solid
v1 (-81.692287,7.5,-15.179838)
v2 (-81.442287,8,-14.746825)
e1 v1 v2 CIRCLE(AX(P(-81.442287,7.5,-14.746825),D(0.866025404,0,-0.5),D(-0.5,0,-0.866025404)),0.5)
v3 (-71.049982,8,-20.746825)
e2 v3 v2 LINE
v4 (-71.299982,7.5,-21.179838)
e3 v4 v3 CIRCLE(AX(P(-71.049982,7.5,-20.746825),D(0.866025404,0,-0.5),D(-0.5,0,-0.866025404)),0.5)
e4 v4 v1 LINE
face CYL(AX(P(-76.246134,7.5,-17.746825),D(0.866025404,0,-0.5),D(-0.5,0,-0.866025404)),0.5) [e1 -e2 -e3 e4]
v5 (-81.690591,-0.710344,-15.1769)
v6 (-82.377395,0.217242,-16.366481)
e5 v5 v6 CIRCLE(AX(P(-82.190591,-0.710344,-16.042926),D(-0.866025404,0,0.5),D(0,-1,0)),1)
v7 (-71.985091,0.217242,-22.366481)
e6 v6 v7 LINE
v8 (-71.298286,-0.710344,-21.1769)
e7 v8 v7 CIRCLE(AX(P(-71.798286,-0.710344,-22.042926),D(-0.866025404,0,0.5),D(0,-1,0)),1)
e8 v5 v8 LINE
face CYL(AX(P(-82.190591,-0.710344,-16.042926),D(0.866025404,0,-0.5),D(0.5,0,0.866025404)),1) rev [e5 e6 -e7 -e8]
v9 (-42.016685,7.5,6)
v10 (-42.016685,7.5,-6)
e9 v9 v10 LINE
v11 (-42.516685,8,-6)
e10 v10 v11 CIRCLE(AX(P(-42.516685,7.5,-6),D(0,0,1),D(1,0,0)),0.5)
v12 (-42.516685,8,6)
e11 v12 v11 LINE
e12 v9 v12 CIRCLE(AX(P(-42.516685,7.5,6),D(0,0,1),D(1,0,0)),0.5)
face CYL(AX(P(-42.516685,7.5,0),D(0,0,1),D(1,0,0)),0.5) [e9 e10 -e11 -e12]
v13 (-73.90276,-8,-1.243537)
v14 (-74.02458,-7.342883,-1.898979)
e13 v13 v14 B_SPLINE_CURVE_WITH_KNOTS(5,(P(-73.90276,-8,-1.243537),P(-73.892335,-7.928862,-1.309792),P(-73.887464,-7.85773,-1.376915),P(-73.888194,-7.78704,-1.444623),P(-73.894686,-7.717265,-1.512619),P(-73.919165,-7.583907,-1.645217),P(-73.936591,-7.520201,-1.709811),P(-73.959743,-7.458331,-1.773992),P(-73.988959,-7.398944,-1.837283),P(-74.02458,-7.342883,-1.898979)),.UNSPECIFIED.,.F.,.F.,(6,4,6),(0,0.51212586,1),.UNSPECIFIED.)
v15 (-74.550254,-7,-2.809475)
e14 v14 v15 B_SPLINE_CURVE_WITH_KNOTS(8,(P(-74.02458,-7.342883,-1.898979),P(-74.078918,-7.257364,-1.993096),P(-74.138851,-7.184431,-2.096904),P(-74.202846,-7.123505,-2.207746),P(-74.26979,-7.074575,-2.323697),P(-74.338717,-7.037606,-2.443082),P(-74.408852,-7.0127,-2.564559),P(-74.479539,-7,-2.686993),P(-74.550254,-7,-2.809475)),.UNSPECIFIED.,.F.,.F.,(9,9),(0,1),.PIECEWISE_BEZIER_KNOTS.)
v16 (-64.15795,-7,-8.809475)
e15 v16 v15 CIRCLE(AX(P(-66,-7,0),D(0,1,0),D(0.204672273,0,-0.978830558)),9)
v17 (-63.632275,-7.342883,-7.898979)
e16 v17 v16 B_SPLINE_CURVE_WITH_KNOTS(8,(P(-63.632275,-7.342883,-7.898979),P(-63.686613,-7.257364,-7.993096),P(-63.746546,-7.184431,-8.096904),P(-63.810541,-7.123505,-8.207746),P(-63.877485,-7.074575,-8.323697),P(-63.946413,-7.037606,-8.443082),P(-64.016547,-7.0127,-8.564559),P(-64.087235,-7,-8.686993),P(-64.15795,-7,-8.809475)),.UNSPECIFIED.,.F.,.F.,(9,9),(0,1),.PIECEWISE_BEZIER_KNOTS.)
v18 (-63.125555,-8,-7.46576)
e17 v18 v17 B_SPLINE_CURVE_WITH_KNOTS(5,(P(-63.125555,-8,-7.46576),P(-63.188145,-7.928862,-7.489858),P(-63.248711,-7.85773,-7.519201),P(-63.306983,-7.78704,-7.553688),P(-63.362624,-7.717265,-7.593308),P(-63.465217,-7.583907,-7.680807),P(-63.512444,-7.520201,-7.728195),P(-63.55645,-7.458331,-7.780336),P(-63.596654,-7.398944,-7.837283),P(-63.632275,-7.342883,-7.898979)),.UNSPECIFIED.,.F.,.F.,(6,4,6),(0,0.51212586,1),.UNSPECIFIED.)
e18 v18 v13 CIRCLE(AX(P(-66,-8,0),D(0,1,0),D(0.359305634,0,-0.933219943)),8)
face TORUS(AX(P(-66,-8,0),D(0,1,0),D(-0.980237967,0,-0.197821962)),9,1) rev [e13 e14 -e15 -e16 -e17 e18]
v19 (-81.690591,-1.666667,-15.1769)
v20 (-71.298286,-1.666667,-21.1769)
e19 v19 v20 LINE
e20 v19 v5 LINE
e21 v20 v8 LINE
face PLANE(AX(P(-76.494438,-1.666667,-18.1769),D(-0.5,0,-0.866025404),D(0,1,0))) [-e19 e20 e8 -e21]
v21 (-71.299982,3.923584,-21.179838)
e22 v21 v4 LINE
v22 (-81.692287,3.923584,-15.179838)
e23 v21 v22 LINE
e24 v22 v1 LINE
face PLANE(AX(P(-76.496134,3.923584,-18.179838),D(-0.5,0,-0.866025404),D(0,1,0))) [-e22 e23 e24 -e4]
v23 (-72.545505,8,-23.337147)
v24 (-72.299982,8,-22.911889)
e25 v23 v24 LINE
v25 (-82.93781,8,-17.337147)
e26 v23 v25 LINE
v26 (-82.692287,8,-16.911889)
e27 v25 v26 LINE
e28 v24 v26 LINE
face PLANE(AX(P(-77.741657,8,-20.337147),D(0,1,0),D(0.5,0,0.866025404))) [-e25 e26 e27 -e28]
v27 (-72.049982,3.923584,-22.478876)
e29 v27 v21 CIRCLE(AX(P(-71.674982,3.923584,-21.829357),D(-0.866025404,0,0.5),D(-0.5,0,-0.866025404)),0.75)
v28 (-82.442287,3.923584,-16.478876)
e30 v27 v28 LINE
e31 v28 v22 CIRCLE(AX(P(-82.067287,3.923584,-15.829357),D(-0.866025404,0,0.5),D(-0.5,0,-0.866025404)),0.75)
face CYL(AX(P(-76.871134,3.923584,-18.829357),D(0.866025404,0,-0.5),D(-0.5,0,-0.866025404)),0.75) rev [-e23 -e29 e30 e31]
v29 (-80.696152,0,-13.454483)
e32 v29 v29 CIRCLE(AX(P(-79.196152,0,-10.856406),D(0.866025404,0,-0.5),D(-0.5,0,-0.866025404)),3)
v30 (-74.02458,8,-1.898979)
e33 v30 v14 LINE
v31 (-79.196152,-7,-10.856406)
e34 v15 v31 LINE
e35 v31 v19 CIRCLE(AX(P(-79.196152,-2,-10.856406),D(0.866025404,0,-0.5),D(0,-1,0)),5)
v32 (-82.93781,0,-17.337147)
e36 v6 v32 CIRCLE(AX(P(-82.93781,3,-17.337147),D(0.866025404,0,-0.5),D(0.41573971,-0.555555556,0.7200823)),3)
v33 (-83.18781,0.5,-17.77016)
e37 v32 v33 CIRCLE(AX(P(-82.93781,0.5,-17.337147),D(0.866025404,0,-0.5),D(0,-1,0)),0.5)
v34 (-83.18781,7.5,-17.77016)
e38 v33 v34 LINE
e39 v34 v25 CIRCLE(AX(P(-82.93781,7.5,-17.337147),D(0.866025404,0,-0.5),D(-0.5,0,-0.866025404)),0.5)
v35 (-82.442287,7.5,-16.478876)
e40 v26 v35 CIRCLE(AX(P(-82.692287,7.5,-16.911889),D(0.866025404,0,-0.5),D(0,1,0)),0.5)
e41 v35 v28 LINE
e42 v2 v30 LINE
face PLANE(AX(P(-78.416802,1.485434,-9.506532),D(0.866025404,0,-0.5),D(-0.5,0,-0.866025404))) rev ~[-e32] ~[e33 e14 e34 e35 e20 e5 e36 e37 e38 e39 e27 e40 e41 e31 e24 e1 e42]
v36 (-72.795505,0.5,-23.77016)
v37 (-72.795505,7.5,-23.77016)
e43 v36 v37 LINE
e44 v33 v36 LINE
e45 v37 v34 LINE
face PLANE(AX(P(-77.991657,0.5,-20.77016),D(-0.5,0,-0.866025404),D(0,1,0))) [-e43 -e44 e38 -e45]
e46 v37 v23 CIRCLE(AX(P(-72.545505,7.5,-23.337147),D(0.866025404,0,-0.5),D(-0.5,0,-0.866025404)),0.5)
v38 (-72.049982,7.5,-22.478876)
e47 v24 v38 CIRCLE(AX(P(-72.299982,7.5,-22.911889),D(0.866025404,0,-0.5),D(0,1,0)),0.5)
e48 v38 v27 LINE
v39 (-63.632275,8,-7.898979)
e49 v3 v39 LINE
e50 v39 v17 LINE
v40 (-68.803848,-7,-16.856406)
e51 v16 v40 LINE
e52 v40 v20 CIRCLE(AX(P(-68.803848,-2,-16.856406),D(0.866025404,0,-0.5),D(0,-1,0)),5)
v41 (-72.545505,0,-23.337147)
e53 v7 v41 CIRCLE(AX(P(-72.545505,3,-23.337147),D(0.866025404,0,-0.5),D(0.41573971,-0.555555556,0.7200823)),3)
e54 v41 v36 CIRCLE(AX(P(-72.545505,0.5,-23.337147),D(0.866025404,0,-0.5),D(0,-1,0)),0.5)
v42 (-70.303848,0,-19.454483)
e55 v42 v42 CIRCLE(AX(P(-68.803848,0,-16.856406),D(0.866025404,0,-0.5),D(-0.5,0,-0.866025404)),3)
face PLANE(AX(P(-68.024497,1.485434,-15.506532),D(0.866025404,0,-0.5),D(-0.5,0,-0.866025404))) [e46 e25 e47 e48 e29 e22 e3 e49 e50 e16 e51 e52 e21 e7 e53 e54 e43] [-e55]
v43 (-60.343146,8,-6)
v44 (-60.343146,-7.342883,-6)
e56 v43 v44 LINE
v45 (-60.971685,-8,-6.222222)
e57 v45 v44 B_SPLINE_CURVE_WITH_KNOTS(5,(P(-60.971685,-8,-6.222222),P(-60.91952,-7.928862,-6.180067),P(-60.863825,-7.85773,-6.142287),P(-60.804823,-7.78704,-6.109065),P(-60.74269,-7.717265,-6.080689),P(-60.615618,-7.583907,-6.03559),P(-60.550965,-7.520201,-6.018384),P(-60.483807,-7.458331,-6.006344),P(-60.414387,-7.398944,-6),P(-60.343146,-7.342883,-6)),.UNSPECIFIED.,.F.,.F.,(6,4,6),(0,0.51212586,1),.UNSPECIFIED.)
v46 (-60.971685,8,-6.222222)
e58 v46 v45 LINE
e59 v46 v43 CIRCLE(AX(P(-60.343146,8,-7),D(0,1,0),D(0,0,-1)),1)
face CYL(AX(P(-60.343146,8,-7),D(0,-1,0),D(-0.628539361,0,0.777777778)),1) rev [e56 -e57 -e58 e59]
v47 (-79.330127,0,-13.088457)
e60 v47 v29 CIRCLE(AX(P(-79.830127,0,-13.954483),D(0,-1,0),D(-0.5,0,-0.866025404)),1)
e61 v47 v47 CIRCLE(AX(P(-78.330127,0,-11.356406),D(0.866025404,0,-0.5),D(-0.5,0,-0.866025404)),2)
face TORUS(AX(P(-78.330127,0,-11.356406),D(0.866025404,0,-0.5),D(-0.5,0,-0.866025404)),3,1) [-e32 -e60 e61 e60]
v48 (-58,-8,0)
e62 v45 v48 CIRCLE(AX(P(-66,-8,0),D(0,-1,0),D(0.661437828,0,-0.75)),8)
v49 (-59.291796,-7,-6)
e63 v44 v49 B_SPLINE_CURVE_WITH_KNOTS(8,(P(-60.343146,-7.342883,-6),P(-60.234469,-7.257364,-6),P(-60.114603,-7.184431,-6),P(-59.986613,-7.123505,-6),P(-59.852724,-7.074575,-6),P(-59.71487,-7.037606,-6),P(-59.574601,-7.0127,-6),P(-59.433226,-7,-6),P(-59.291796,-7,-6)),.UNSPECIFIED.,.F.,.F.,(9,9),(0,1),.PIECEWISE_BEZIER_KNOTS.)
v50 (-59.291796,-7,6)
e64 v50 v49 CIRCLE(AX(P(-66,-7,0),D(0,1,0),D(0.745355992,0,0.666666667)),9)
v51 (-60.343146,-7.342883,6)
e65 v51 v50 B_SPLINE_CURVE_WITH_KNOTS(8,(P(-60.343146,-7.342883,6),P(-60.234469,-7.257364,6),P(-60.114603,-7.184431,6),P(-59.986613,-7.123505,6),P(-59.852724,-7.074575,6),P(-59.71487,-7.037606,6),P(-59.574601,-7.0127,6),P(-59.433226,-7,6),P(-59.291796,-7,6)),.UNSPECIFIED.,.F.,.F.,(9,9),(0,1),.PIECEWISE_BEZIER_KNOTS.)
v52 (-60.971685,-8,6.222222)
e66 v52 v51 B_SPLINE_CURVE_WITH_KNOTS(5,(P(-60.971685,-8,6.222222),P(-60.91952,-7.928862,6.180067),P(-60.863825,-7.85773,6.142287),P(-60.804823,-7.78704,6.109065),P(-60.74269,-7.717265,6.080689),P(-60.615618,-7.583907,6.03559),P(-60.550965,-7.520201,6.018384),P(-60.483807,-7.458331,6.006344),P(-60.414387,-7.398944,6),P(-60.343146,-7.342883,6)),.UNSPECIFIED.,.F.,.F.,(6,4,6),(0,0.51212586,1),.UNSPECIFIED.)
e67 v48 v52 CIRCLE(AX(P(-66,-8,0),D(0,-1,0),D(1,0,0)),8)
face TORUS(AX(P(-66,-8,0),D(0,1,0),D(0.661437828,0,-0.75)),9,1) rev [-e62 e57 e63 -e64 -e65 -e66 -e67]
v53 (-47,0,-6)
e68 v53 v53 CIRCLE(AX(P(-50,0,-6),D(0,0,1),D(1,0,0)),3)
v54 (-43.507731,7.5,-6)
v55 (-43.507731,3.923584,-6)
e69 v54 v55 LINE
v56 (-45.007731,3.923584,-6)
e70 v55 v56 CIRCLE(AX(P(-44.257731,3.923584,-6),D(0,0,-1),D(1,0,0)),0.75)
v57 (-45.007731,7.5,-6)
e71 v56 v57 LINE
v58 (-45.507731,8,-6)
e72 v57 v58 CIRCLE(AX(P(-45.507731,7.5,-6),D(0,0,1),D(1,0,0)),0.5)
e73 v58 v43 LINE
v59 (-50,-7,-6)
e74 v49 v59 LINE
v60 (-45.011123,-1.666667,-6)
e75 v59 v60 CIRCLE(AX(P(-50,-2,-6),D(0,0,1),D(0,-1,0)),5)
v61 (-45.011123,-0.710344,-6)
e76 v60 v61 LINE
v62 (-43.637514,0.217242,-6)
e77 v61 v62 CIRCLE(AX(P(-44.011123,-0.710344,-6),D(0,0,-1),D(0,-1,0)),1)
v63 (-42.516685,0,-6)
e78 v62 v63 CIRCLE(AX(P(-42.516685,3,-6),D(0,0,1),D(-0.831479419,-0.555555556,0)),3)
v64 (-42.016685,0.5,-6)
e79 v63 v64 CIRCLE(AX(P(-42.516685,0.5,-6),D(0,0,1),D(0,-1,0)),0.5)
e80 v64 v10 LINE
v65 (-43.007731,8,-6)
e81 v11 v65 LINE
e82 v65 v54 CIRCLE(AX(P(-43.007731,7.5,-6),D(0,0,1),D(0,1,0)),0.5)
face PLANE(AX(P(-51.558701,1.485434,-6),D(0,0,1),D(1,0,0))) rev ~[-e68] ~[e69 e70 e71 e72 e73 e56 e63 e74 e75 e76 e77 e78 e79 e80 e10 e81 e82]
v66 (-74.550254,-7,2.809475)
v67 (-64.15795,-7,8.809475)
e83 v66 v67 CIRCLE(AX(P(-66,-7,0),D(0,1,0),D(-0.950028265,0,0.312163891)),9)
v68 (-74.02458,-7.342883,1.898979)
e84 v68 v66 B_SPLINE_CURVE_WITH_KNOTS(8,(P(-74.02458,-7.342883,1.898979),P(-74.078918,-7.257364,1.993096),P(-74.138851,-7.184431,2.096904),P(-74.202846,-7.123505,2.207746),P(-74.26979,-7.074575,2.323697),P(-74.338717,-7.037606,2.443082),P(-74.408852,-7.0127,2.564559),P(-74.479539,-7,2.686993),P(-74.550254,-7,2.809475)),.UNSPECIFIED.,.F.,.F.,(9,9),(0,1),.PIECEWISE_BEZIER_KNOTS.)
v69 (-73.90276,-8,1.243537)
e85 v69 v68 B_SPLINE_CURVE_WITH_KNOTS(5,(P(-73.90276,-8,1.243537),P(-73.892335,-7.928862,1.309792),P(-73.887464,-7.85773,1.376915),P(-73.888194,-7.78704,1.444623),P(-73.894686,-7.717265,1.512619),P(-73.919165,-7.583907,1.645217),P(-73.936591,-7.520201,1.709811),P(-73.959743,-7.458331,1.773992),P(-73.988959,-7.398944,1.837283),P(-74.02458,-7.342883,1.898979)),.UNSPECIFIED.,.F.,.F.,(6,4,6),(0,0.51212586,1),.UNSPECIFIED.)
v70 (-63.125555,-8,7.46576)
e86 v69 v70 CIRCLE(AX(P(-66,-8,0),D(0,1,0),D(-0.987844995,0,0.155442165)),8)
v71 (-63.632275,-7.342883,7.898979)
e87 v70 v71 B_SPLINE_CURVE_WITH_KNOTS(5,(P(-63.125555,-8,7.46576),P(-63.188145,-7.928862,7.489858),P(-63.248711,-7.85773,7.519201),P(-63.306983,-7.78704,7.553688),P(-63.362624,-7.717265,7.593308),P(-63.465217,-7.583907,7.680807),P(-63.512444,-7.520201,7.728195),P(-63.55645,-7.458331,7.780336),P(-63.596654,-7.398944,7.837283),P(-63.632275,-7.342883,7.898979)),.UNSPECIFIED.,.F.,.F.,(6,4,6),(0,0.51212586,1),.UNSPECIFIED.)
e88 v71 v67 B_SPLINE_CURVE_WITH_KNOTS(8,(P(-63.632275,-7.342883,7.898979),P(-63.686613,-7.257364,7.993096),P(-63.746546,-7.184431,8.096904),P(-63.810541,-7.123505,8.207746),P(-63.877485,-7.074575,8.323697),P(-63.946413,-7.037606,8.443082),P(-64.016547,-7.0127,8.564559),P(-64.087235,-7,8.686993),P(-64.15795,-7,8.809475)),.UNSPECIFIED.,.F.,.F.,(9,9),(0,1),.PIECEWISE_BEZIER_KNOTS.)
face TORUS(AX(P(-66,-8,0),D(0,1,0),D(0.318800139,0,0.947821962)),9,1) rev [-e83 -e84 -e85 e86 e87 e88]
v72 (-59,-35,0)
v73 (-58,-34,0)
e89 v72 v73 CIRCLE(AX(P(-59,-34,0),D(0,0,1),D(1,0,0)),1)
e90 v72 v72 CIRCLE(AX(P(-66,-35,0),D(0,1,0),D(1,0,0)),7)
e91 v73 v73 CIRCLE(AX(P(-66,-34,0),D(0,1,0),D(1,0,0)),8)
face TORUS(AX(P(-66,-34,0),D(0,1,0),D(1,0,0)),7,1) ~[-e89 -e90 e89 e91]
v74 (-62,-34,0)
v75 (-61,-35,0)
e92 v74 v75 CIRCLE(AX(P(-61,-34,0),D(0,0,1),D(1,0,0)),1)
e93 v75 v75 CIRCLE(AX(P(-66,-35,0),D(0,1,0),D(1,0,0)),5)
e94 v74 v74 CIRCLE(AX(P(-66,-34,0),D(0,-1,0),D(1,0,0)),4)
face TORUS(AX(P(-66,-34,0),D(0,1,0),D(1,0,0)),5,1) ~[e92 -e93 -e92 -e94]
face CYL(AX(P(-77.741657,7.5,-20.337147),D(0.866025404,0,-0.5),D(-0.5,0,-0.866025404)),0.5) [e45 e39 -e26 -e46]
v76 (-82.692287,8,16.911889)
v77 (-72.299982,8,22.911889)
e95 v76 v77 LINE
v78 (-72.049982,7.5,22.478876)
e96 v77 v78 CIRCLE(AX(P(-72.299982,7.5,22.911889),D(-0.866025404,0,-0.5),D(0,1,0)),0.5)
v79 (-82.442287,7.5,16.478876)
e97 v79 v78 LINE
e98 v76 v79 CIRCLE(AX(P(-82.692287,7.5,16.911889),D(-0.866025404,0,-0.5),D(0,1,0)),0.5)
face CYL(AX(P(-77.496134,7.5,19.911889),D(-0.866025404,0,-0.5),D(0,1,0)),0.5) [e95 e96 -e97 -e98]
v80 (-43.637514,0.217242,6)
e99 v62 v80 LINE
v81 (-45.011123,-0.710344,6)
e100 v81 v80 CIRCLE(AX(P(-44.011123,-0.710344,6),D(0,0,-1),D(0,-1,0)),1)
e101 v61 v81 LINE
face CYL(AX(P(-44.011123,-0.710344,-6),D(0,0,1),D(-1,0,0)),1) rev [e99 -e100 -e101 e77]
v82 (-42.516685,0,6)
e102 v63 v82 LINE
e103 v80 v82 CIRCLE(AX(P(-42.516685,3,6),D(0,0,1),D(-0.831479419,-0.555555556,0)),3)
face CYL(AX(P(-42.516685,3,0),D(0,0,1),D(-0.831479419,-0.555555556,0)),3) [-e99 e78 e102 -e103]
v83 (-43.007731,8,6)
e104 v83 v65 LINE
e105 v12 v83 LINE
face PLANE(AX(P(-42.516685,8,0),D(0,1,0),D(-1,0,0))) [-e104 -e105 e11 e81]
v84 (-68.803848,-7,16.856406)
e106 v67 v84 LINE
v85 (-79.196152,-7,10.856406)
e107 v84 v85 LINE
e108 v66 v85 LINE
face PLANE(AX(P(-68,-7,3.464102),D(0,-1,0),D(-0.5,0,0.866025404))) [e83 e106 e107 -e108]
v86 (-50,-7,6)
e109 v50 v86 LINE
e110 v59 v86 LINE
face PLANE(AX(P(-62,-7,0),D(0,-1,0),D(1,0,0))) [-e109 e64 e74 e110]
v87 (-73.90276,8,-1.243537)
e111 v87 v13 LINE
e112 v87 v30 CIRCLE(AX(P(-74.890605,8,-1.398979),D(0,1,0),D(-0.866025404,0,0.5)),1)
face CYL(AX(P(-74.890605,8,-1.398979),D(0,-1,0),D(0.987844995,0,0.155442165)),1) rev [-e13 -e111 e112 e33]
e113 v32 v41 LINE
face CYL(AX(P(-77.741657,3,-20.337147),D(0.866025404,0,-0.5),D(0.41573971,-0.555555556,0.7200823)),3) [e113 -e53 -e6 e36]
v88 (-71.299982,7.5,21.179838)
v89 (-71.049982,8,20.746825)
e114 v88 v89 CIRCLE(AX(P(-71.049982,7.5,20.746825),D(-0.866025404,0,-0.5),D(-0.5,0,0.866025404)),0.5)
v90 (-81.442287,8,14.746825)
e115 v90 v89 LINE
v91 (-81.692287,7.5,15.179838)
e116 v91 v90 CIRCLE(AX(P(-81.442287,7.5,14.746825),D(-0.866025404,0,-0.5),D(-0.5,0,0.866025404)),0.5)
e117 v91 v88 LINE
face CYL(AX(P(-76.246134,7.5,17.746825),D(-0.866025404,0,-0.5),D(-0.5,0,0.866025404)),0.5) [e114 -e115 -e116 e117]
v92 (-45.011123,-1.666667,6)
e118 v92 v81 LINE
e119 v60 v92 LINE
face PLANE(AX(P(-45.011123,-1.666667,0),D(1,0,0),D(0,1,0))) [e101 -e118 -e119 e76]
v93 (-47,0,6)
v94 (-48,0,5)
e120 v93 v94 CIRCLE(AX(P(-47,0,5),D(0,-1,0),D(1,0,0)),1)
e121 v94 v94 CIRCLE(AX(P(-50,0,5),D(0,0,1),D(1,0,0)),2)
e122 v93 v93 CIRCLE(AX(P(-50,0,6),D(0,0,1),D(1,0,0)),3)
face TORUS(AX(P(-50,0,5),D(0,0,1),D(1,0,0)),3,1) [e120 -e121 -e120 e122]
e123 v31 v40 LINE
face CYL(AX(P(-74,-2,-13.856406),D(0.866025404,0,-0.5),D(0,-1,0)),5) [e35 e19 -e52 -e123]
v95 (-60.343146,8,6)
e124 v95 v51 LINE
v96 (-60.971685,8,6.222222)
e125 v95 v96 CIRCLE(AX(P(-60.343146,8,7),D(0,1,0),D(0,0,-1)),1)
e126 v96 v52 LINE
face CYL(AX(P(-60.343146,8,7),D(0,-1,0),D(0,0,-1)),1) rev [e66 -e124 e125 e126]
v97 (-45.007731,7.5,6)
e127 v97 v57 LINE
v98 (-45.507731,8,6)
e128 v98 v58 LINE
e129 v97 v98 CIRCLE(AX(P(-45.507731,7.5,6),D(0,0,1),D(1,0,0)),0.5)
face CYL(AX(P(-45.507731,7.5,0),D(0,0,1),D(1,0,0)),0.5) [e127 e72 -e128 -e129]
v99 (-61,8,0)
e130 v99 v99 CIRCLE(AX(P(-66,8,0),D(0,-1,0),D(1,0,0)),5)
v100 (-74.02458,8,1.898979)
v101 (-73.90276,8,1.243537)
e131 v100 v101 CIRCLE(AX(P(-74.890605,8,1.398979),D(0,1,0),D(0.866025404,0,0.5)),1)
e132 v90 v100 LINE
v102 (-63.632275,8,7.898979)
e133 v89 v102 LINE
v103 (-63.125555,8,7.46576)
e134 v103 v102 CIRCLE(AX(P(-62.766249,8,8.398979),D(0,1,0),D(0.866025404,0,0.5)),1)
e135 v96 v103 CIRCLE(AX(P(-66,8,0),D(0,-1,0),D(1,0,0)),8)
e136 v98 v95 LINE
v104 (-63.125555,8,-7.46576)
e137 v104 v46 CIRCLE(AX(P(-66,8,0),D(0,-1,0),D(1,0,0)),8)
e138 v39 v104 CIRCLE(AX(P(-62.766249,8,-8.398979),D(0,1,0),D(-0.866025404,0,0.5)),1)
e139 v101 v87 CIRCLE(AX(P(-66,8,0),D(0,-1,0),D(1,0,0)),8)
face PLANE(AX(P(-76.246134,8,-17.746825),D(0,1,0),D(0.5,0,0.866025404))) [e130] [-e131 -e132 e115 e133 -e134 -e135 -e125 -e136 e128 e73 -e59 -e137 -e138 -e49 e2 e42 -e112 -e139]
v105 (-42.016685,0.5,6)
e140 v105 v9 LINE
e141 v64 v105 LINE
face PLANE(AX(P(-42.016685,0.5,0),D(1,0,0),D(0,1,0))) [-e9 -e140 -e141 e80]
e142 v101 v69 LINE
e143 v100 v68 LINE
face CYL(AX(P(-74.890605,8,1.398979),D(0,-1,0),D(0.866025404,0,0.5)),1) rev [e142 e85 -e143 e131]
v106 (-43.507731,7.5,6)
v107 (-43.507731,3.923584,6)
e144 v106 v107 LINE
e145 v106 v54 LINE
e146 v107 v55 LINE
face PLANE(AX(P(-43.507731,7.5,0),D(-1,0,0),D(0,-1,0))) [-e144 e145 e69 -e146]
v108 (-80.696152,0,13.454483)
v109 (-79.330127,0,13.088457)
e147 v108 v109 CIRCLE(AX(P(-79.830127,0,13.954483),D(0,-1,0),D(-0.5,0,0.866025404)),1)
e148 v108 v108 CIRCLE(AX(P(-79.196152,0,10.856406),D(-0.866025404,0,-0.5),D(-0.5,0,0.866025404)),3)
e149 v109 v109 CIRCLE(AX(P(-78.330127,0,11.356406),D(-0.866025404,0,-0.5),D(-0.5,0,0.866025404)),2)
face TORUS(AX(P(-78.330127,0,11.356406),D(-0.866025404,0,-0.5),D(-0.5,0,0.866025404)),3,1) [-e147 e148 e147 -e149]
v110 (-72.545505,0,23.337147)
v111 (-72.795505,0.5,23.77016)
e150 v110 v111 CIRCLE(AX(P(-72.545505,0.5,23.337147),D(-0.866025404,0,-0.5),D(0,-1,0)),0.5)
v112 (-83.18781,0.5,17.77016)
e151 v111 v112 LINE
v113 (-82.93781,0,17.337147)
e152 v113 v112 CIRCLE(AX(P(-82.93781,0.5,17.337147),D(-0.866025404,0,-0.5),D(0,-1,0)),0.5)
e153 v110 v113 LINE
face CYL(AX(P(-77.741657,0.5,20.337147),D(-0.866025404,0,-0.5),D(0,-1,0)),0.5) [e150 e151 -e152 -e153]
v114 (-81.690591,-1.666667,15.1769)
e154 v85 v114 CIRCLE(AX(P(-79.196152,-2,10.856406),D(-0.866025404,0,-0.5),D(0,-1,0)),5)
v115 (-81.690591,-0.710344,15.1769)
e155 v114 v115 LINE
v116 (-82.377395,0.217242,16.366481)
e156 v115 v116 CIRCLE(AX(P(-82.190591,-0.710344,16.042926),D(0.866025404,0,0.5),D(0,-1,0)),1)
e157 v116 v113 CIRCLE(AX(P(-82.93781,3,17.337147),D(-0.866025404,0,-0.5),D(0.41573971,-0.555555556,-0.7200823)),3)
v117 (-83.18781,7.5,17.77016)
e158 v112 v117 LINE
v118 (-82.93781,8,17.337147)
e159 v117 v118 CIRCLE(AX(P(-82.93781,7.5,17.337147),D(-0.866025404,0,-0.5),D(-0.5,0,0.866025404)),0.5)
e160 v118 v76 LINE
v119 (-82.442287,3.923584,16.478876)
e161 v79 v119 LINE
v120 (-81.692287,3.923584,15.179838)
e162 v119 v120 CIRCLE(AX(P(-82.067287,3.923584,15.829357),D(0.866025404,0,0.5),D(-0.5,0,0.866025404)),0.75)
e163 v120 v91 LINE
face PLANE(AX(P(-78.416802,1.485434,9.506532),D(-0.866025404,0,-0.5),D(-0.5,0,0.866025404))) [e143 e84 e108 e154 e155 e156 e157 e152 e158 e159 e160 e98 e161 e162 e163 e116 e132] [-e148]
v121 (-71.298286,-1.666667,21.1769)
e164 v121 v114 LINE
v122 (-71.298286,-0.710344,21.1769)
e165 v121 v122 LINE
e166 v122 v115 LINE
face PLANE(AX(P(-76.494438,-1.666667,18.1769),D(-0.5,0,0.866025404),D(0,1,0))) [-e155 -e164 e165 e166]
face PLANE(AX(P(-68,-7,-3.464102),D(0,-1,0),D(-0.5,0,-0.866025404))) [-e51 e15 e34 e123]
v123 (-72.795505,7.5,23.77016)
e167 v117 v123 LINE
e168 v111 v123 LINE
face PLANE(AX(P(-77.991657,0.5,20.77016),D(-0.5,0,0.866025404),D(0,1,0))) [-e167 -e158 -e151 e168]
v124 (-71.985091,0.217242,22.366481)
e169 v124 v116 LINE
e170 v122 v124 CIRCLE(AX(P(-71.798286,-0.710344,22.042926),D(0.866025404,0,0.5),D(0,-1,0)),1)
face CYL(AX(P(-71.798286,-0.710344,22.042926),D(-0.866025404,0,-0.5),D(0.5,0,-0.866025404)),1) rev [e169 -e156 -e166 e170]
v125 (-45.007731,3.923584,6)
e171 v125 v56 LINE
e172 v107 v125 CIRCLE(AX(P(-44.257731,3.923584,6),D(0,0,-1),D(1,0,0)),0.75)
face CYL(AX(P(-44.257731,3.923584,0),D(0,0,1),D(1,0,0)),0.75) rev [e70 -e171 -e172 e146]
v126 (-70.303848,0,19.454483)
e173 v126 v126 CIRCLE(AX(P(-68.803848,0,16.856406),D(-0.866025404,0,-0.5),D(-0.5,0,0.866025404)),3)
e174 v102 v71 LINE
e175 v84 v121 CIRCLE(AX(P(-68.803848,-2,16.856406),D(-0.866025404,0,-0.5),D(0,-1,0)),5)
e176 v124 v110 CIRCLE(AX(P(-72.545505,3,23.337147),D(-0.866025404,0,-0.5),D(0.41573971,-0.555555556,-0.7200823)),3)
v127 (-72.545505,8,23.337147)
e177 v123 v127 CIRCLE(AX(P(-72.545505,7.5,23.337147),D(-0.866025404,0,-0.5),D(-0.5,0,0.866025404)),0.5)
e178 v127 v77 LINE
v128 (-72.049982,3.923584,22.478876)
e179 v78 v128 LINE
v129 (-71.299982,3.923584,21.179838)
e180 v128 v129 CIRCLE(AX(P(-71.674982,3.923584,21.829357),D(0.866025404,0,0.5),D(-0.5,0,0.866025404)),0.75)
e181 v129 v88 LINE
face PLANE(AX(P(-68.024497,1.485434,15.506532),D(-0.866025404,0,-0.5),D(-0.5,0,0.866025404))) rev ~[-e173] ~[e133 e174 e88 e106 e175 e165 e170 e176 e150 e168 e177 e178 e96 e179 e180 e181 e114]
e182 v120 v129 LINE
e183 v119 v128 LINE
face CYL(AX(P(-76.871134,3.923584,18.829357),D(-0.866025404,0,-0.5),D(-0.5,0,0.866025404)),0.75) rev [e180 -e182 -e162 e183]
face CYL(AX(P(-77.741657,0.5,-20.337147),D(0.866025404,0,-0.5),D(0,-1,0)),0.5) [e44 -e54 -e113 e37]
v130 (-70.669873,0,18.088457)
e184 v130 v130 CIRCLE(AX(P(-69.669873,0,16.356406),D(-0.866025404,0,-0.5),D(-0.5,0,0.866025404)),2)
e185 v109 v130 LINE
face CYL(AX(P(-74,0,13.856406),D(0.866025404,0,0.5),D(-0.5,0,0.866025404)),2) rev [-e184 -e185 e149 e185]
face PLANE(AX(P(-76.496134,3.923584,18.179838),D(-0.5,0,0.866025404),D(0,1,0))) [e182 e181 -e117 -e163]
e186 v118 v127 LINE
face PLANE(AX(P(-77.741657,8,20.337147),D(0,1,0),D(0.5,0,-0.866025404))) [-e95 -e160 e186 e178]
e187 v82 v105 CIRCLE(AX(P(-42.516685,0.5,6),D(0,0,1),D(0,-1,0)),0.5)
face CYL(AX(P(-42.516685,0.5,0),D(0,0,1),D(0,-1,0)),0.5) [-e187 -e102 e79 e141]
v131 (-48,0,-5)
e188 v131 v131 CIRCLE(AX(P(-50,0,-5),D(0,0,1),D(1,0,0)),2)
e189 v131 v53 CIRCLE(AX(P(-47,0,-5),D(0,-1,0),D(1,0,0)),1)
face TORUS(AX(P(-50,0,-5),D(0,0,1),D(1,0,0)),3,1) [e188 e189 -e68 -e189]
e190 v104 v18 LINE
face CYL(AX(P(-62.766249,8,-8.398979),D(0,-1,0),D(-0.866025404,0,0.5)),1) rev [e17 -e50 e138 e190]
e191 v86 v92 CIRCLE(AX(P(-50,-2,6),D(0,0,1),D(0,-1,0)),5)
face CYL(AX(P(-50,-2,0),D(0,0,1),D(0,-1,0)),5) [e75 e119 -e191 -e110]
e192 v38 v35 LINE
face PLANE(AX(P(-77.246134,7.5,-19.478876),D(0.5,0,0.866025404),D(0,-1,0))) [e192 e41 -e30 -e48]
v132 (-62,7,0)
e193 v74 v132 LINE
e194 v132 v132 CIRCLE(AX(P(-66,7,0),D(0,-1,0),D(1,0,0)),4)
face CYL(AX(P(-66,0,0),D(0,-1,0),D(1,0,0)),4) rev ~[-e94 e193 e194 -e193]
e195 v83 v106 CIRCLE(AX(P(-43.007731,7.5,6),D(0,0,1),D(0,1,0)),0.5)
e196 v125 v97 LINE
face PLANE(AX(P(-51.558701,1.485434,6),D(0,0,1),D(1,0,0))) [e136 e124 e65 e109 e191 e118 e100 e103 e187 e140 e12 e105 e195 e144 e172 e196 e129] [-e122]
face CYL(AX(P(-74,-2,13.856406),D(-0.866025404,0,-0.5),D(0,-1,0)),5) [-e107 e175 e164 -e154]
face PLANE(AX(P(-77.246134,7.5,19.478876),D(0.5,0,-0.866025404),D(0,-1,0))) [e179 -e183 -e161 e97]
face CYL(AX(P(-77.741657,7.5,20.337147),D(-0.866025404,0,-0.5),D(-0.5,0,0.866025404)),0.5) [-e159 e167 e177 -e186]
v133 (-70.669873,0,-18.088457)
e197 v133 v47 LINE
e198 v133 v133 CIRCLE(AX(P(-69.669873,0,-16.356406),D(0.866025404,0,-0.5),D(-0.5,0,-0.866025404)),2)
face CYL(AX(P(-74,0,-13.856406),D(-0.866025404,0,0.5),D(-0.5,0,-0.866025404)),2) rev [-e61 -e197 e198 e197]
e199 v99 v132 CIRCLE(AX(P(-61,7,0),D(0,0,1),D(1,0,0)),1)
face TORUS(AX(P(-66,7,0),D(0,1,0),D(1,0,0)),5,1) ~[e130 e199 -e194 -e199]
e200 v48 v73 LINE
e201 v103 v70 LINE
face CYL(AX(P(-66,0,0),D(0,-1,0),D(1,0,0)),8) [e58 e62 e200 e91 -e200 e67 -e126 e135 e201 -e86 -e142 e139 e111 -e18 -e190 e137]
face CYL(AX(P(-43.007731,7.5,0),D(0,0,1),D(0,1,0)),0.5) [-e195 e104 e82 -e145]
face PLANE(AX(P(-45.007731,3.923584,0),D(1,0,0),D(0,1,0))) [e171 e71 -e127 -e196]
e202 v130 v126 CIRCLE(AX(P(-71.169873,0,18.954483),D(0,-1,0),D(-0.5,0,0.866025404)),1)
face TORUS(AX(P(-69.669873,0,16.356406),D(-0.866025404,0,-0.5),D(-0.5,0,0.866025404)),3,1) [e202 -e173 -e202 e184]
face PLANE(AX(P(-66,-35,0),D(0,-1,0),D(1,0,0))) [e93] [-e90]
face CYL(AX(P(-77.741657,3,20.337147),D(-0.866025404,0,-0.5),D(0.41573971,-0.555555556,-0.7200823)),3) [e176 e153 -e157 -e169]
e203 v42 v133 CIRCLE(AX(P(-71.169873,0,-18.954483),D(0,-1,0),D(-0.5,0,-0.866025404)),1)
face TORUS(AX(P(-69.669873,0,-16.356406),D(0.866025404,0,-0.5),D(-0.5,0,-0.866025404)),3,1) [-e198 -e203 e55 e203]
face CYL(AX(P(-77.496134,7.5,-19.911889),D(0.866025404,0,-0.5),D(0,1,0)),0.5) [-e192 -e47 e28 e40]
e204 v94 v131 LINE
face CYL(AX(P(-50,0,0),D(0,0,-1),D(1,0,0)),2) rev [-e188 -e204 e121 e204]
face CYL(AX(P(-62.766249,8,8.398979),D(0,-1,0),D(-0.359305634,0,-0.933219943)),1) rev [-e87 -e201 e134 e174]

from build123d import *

# Parameters (mm, degrees)
F0_R          = 8
F0_R_2        = 4
F1_DEPTH      = 35
F1_DEPTH_BACK = 8
F2_R          = 2
F3_DEPTH      = 6
F4_R          = 1
F5_COUNT      = 3


# Not quite as in the source:
# - a feature of the source that left no trace in its solid (it failed there, or was rolled back) is left out
# - a feature names something its author has since deleted; it is built from what else it names


with BuildPart() as f1:
    # F0 (on Front) → F1 (new body, two sides)
    with BuildSketch(Plane.XZ) as f1_sk:
        with Locations((-66, 0)):
            Circle(F0_R)
        with Locations((-66, 0)):
            Circle(F0_R_2, mode=Mode.SUBTRACT)
    extrude(amount=F1_DEPTH)
    extrude(f1_sk.sketch, amount=-F1_DEPTH_BACK)

    # F2 (on Top) → F3 (join, symmetric)
    with BuildSketch(Plane.XY):
        with BuildLine():
            Line((-45.5077314954, 8), (-62, 8))
            Line((-62, 8), (-62, -7))
            Line((-62, -7), (-50, -7))
            ThreePointArc((-50, -7), (-46.3485162833, -5.4156502553), (-45.0111234843, -1.6666666667))
            Line((-45.0111234843, -1.6666666667), (-45.0111234843, 1.3333333333))
            ThreePointArc((-45.0111234843, 1.3333333333), (-43.9308987888, 0.3542486889), (-42.5166852265, 0))
            ThreePointArc((-42.5166852265, 0), (-42.1631318359, 0.1464466094), (-42.0166852265, 0.5))
            Line((-42.0166852265, 0.5), (-42.0166852265, 7.5))
            ThreePointArc((-42.0166852265, 7.5), (-42.1631318359, 7.8535533906), (-42.5166852265, 8))
            Line((-42.5166852265, 8), (-43.0077314954, 8))
            ThreePointArc((-43.0077314954, 8), (-43.361284886, 7.8535533906), (-43.5077314954, 7.5))
            Line((-43.5077314954, 7.5), (-43.5077314954, 3.9235844234))
            ThreePointArc((-43.5077314954, 3.9235844234), (-44.2577314954, 3.1735844234), (-45.0077314954, 3.9235844234))
            Line((-45.0077314954, 3.9235844234), (-45.0077314954, 7.5))
            ThreePointArc((-45.0077314954, 7.5), (-45.1541781048, 7.8535533906), (-45.5077314954, 8))
        make_face()
        with Locations((-50, 0)):
            Circle(F2_R, mode=Mode.SUBTRACT)
    extrude(amount=F3_DEPTH, both=True)

    # F4
    f4_edges = [f1.edges().sort_by_distance(p)[0] for p in [
        (-52, 0, 6),
        (-52, 0, -6),
        (-70, 8, 0),
        (-70, -35, 0),
        (-74, -35, 0),
        (-58.708497, -7, 3.291503),
        (-60.708497, -3.5, 6),
        (-60.708497, -3.5, -6),
        (-58.708497, -7, -3.291503),
        (-45.011123, 1.333333, 0),
        (-60.708497, 4, -6),
        (-60.708497, 4, 6),
    ]]
    fillet(f4_edges, radius=F4_R)

    # F5: F1 ×3 about axis
    f5_axis = Axis((-66, -34, 0), (0, -1, 0))


with BuildPart() as f1_1:
    add(f1.part)
    for i in range(1, F5_COUNT):
        add(f1.part.rotate(f5_axis, i * 360 / F5_COUNT))


solid = f1_1.part
